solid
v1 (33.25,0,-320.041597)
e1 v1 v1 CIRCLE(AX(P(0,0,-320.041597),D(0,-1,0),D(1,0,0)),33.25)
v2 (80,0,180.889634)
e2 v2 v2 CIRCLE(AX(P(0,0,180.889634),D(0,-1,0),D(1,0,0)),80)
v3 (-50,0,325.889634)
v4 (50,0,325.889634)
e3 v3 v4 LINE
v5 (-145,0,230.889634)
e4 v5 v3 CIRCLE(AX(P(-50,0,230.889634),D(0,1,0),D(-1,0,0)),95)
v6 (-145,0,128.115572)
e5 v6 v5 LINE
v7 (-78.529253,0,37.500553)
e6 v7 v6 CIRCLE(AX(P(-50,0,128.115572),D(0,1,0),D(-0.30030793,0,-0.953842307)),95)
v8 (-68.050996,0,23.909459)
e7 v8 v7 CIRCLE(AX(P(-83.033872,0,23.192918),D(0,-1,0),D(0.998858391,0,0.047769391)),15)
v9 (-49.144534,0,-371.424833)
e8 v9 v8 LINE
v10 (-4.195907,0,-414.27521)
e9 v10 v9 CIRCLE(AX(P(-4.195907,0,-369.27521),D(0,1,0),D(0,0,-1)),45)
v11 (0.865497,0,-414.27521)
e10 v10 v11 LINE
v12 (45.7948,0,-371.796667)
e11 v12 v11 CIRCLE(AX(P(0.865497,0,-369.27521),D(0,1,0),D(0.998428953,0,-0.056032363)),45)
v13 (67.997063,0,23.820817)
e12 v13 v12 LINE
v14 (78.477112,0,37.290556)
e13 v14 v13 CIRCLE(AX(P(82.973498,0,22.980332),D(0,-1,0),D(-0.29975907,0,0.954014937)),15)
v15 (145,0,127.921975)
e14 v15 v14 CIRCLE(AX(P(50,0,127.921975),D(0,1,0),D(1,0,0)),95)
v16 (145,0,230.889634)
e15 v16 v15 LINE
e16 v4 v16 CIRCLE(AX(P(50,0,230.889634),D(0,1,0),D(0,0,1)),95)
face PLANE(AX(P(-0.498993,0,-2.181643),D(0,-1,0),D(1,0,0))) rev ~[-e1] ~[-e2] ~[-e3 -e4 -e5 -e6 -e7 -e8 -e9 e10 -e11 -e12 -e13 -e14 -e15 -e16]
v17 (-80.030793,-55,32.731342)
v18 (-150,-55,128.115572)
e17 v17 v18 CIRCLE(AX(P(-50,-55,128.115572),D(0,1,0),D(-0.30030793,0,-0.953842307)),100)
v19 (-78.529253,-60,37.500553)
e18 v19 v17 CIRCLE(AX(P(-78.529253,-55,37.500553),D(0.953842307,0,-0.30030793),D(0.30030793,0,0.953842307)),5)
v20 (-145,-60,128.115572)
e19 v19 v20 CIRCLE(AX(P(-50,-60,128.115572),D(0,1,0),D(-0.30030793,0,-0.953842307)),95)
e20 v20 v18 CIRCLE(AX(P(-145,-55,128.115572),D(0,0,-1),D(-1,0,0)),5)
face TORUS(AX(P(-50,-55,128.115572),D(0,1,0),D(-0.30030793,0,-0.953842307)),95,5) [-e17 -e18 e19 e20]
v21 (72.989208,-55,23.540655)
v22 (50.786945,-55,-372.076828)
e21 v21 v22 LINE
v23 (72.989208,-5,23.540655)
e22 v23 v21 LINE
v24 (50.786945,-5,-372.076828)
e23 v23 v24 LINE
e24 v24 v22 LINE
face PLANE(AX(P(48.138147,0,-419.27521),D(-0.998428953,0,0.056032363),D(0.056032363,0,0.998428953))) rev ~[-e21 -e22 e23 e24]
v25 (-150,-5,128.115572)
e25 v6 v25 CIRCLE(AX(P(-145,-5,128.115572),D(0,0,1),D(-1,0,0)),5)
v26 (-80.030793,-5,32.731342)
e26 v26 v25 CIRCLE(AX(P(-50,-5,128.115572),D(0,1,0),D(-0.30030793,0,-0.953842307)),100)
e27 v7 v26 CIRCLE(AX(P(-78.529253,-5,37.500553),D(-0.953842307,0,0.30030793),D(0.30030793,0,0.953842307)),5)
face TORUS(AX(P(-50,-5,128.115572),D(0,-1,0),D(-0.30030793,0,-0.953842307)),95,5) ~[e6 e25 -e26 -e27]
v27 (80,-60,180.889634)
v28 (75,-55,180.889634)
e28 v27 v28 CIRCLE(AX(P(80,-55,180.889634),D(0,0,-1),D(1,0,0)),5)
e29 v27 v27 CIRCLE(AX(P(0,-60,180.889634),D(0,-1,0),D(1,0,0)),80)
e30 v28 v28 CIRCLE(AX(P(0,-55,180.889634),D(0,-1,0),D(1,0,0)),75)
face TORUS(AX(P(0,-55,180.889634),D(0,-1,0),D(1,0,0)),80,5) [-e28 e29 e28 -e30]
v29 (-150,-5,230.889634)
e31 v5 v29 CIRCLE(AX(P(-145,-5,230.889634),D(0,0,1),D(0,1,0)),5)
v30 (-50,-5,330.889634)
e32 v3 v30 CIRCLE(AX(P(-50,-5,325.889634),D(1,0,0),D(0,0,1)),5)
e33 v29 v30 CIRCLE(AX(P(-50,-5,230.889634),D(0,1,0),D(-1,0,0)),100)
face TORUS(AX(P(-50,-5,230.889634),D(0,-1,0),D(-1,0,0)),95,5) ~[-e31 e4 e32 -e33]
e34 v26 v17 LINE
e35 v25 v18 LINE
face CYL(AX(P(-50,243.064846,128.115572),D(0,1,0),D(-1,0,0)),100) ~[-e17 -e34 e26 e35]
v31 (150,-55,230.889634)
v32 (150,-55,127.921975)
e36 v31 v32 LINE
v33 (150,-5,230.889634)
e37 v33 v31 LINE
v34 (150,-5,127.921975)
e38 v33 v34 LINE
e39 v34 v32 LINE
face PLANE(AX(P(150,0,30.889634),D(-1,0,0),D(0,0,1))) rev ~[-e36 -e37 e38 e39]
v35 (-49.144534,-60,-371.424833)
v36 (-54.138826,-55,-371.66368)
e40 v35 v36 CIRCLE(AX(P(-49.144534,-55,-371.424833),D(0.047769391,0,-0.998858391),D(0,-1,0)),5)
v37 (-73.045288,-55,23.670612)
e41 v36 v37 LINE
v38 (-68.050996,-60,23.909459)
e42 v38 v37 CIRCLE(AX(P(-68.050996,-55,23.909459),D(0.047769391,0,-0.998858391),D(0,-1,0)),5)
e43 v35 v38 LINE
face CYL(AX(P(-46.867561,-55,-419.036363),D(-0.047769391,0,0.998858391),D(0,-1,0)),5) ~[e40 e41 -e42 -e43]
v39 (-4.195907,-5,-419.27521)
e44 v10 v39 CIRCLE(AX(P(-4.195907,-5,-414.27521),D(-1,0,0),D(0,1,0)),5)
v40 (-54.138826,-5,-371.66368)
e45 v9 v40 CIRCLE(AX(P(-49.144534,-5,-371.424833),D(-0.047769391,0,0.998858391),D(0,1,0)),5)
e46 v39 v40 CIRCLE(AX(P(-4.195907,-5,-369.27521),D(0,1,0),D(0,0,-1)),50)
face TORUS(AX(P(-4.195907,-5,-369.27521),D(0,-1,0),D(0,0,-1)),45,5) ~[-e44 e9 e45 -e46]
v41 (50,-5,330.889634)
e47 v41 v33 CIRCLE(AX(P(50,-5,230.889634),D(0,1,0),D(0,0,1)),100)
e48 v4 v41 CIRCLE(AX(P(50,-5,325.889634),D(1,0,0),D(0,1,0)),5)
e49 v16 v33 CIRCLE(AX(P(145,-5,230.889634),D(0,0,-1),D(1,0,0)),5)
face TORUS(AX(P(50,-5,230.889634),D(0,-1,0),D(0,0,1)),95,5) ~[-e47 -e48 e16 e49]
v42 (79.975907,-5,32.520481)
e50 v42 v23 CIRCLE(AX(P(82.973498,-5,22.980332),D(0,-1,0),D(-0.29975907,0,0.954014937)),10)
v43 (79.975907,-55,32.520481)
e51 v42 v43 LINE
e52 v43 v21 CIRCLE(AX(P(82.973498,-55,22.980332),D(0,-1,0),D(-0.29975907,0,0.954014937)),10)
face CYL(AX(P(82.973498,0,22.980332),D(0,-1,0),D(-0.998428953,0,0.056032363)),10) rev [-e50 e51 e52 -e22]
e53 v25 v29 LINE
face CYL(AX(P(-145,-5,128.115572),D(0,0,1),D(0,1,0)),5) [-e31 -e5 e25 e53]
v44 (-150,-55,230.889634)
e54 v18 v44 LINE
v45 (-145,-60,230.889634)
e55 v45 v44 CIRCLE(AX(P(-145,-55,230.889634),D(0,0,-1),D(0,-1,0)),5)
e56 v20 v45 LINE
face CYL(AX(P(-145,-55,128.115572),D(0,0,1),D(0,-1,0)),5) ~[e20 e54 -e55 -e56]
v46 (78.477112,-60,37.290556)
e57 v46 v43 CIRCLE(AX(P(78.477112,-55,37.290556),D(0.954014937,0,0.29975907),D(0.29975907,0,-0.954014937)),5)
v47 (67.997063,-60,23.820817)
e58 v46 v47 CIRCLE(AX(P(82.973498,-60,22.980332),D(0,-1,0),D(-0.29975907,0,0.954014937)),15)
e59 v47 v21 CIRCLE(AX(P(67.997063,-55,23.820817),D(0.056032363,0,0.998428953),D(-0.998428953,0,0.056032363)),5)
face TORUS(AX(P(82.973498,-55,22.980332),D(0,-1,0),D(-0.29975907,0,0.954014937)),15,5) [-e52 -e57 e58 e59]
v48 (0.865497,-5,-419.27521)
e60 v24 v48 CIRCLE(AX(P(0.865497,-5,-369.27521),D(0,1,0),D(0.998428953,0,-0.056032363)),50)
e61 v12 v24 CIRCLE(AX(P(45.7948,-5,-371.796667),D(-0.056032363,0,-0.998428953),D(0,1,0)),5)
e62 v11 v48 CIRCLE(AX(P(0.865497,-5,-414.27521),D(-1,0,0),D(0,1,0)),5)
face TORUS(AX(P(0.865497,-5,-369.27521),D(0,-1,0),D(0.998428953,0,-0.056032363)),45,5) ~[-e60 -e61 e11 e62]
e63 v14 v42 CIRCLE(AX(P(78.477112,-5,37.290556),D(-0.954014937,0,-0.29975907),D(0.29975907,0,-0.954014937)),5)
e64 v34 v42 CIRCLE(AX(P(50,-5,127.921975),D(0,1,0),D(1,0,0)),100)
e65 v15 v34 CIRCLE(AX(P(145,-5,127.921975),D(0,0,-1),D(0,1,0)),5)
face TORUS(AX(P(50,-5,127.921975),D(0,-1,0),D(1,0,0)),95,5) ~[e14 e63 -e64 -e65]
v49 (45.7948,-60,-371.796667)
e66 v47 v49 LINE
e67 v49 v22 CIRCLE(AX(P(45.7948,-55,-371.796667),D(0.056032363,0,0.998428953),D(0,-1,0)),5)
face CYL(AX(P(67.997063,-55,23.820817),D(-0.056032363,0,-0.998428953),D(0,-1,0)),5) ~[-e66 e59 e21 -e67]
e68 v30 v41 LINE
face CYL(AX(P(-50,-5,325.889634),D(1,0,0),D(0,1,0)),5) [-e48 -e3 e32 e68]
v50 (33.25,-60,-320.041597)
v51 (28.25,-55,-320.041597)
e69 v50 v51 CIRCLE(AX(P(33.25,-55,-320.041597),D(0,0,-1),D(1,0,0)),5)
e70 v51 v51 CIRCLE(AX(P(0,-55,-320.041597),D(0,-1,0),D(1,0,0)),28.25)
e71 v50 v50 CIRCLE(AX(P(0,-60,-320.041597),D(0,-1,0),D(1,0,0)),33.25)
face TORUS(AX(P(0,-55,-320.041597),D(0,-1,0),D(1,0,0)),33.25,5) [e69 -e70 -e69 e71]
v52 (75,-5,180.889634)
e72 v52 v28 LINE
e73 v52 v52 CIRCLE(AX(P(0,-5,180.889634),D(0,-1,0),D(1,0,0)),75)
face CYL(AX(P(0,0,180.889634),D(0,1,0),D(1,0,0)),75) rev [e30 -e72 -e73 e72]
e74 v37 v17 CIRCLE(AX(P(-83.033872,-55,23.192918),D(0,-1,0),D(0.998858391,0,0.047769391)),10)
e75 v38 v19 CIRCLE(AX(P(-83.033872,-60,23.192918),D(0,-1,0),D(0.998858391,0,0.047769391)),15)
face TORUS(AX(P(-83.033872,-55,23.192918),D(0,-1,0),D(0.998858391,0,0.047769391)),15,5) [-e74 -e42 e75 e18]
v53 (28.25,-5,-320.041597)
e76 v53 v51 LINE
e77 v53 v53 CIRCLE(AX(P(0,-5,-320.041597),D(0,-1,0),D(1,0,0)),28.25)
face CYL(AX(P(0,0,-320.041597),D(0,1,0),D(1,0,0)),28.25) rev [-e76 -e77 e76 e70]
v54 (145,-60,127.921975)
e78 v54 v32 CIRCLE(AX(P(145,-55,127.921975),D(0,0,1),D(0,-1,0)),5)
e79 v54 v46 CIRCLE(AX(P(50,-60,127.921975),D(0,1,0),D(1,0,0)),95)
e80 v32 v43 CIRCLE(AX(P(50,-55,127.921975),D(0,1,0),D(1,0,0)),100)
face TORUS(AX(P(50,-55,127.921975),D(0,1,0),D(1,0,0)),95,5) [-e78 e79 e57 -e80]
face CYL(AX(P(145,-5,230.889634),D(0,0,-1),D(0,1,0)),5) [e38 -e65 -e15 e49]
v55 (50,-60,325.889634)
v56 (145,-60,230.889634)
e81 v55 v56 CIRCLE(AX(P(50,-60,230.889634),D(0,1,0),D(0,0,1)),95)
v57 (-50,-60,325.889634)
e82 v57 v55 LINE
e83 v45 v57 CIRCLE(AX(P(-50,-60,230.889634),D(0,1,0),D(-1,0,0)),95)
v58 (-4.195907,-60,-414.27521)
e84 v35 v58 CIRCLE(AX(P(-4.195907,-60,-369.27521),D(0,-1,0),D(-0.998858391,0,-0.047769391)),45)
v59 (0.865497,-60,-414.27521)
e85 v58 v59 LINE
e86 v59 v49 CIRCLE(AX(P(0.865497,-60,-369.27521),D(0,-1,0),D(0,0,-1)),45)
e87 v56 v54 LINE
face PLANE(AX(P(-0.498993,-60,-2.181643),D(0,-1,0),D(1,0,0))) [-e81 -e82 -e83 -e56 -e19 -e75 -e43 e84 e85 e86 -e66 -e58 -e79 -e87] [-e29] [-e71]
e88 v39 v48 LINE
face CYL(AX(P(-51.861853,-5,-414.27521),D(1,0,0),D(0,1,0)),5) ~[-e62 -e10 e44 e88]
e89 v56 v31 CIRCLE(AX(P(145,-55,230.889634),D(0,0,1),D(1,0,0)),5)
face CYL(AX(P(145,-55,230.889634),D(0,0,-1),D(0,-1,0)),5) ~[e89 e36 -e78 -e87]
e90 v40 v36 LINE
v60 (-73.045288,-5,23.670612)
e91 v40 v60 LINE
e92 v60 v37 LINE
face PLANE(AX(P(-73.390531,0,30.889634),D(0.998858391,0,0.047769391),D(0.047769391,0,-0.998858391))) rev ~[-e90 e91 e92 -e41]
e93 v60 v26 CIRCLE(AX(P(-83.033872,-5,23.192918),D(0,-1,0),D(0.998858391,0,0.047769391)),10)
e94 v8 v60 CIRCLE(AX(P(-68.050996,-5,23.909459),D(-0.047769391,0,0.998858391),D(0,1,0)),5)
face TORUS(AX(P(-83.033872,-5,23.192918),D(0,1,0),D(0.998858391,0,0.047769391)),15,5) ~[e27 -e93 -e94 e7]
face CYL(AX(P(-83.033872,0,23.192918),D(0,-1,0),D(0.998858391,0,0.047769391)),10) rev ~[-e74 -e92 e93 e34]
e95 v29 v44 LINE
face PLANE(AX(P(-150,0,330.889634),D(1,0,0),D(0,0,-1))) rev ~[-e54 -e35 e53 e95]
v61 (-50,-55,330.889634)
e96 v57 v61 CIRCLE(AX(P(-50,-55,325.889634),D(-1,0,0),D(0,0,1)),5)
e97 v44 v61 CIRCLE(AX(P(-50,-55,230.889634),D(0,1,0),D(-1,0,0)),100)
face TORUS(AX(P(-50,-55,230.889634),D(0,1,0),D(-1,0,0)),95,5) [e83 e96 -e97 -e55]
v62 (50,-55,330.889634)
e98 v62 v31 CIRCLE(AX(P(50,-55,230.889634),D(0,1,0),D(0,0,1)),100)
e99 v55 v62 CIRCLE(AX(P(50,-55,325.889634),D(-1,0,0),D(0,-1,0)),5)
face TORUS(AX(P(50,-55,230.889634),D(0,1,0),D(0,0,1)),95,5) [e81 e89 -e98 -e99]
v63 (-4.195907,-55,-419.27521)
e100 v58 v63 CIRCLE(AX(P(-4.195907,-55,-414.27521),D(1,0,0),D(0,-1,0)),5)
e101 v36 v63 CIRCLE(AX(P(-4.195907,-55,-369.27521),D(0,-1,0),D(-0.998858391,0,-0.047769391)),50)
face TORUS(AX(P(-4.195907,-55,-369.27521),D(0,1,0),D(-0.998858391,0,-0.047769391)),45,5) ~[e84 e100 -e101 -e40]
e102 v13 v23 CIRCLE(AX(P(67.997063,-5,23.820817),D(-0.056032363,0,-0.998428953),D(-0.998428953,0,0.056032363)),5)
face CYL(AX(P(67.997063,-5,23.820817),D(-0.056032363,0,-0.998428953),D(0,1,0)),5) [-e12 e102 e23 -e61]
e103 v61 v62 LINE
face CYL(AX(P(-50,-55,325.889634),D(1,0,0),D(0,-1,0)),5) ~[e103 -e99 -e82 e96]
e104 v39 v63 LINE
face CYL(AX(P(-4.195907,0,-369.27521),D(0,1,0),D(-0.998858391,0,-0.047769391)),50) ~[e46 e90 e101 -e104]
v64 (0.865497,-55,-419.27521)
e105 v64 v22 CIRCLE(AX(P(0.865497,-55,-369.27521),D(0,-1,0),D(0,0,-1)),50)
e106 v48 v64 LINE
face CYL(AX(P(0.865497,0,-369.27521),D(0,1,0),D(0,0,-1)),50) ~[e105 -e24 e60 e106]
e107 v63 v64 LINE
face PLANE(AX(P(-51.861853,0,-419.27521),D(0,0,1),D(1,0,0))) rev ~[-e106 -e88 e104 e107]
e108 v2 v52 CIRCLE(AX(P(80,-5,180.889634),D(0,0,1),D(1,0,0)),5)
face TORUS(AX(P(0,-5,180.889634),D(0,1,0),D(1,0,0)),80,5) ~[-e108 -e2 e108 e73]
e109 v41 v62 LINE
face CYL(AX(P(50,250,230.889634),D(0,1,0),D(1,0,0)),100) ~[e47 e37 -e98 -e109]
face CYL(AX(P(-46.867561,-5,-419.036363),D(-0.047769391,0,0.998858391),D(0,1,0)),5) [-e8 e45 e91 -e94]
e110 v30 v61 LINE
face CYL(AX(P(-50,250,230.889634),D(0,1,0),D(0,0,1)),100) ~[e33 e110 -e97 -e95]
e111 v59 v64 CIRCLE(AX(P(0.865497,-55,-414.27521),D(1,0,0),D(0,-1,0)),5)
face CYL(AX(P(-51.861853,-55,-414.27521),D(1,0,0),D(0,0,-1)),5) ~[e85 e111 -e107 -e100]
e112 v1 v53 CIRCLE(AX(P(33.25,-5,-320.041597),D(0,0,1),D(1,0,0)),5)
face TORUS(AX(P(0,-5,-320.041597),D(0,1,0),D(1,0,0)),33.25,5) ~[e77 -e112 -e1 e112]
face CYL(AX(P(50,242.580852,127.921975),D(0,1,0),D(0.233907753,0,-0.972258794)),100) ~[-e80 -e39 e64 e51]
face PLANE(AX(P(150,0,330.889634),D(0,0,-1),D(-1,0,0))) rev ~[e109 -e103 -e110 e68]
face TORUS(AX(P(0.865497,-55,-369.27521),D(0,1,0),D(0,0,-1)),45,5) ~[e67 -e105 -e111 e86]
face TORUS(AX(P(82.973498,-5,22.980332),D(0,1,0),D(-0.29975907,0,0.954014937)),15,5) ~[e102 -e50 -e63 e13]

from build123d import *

# Parameters (mm, degrees)
F0_R         = 28.25
F0_R_2       = 75
F1_DEPTH     = 60
F3_T1_DEPTH  = 545.1617031196
F3_T3_DEPTH  = 546.1296912431
F3_T5_DEPTH  = 560
F4_R         = 10
F5_R         = 5
F6_T1_DEPTH  = 60
F6_T4_ANGLE  = 87.2619735231
F6_T6_ANGLE  = 87.2619735231
F6_T8_ANGLE  = 86.7878998104
F6_T10_ANGLE = 86.7878998104


# Not quite as in the source:
# - a fillet or chamfer that OpenCascade refuses, or shapes differently, is made with other operations: its cross-section is extruded or revolved along the edge and cut away or added
# - a feature of the source that left no trace in its solid (it failed there, or was rolled back) is left out


with BuildPart() as f1:
    # F0 (on Front) → F1 (new body)
    with BuildSketch(Plane.XZ):
        Polygon((-73.3905308122, 30.889634043), (-51.8618531352, -419.2752103038), (48.1381468648, -419.2752103038), (73.3907752815, 30.6960952328), (150, 30.889634043), (150, 330.889634043), (-150, 330.889634043), (-150, 30.889634043), align=None)
        with Locations((0, -320.0415968895)):
            Circle(F0_R, mode=Mode.SUBTRACT)
        with Locations((0, 180.889634043)):
            Circle(F0_R_2, mode=Mode.SUBTRACT)
    extrude(amount=F1_DEPTH)

    # F3: fillet of radius 100 on 4 edges, made by hand

    # F3_s2 → F3_t1 (cut)
    with BuildSketch(Plane.XZ.offset(-242.5808515598)):
        with BuildLine():
            ThreePointArc((73.3907752815, 30.6960952328), (128.5464115289, 66.0312545554), (150, 127.9219746669))
            Line((150, 127.9219746669), (150, 30.889634043))
            Line((150, 30.889634043), (73.3907752815, 30.6960952328))
        make_face()
    extrude(amount=F3_T1_DEPTH, mode=Mode.SUBTRACT)

    # F3_s4 → F3_t3 (cut)
    with BuildSketch(Plane.XZ.offset(-243.0648456216)):
        with BuildLine():
            ThreePointArc((-150, 128.1155722916), (-128.5463337184, 66.2247534297), (-73.3905308122, 30.889634043))
            Line((-73.3905308122, 30.889634043), (-150, 30.889634043))
            Line((-150, 30.889634043), (-150, 128.1155722916))
        make_face()
    extrude(amount=F3_T3_DEPTH, mode=Mode.SUBTRACT)

    # F3_s6 → F3_t5 (cut)
    with BuildSketch(Plane.XZ.offset(-250)):
        with BuildLine():
            ThreePointArc((150, 230.889634043), (120.7106781187, 301.6003121616), (50, 330.889634043))
            Line((50, 330.889634043), (150, 330.889634043))
            Line((150, 330.889634043), (150, 230.889634043))
        make_face()
        with BuildLine():
            ThreePointArc((-50, 330.889634043), (-120.7106781187, 301.6003121616), (-150, 230.889634043))
            Line((-150, 230.889634043), (-150, 330.889634043))
            Line((-150, 330.889634043), (-50, 330.889634043))
        make_face()
    extrude(amount=F3_T5_DEPTH, mode=Mode.SUBTRACT)

    # F4
    f4_edges = [f1.edges().sort_by_distance(p)[0] for p in [
        (-73.390531, -30, 30.889634),
        (73.390775, -30, 30.696095),
    ]]
    fillet(f4_edges, radius=F4_R)

    # F5
    f5_edges = [f1.edges().sort_by_distance(p)[0] for p in [
        (-130.632125, 0, 68.967788),
        (-75.114274, 0, 29.298651),
        (-150, 0, 179.502603),
        (-62.453571, 0, -197.802299),
        (-120.710678, 0, 301.600312),
        (-1.861853, 0, -419.27521),
        (0, 0, 330.889634),
        (60.563678, 0, -197.867278),
        (120.710678, 0, 301.600312),
        (75.080994, 0, 29.121046),
        (150, 0, 179.405804),
        (130.615106, 0, 68.750997),
        (-28.25, 0, -320.041597),
        (-75, 0, 180.889634),
        (-130.632125, -60, 68.967788),
        (-75.114274, -60, 29.298651),
        (-150, -60, 179.502603),
        (-62.453571, -60, -197.802299),
        (-120.710678, -60, 301.600312),
        (-1.861853, -60, -419.27521),
        (0, -60, 330.889634),
        (60.563678, -60, -197.867278),
        (120.710678, -60, 301.600312),
        (75.080994, -60, 29.121046),
        (150, -60, 179.405804),
        (130.615106, -60, 68.750997),
        (-28.25, -60, -320.041597),
        (-75, -60, 180.889634),
    ]]
    fillet(f5_edges, radius=F5_R)

    # F6: fillet of radius 50 on 2 edges, made by hand

    # F6_s2 → F6_t1 (cut)
    with BuildSketch(Plane.XZ):
        with BuildLine():
            ThreePointArc((0.8654974445, -419.2752103038), (35.2160366942, -405.6075712682), (50.7869450983, -372.0768284339))
            Line((50.7869450983, -372.0768284339), (48.1381468648, -419.2752103038))
            Line((48.1381468648, -419.2752103038), (0.8654974445, -419.2752103038))
        make_face()
        with BuildLine():
            ThreePointArc((-54.1388263505, -371.6636798405), (-38.6964613108, -405.4651500442), (-4.1959067996, -419.2752103038))
            Line((-4.1959067996, -419.2752103038), (-51.8618531352, -419.2752103038))
            Line((-51.8618531352, -419.2752103038), (-54.1388263505, -371.6636798405))
        make_face()
    extrude(amount=F6_T1_DEPTH, mode=Mode.SUBTRACT)

    # F6_s3 → F6_t4 (revolve, cut)
    with BuildSketch(Plane.YZ.offset(-4.1959067996)):
        with BuildLine():
            ThreePointArc((0, -414.2752103038), (-1.4644660941, -417.8107442097), (-5, -419.2752103038))
            Line((-5, -419.2752103038), (0, -419.2752103038))
            Line((0, -419.2752103038), (0, -414.2752103038))
        make_face()
    revolve(axis=Axis((-4.1959067996, 0, -369.2752103038), (0, 1, 0)), revolution_arc=F6_T4_ANGLE, mode=Mode.SUBTRACT)

    # F6_s5 → F6_t6 (revolve, cut)
    with BuildSketch(Plane(origin=(17.6103390671, 0, -368.2323486843), x_dir=(0, 1, 0), z_dir=(-0.0477693907, 0, 0.998858391))):
        with BuildLine():
            ThreePointArc((-60, 66.8311685248), (-58.5355339059, 70.3667024307), (-55, 71.8311685248))
            Line((-55, 71.8311685248), (-60, 71.8311685248))
            Line((-60, 71.8311685248), (-60, 66.8311685248))
        make_face()
    revolve(axis=Axis((-4.1959067996, -60, -369.2752103038), (0, -1, 0)), revolution_arc=F6_T6_ANGLE, mode=Mode.SUBTRACT)

    # F6_s7 → F6_t8 (revolve, cut)
    with BuildSketch(Plane(origin=(-20.6561380445, 0, -368.067404701), x_dir=(0, 1, 0), z_dir=(0.0560323626, 0, 0.9984289531))):
        with BuildLine():
            ThreePointArc((0, -66.5555001912), (-1.4644660941, -70.0910340971), (-5, -71.5555001912))
            Line((-5, -71.5555001912), (0, -71.5555001912))
            Line((0, -71.5555001912), (0, -66.5555001912))
        make_face()
    revolve(axis=Axis((0.8654974445, 0, -369.2752103038), (0, 1, 0)), revolution_arc=F6_T8_ANGLE, mode=Mode.SUBTRACT)

    # F6_s9 → F6_t10 (revolve, cut)
    with BuildSketch(Plane.YZ.offset(0.8654974445)):
        with BuildLine():
            ThreePointArc((-60, -414.2752103038), (-58.5355339059, -417.8107442097), (-55, -419.2752103038))
            Line((-55, -419.2752103038), (-60, -419.2752103038))
            Line((-60, -419.2752103038), (-60, -414.2752103038))
        make_face()
    revolve(axis=Axis((0.8654974445, -60, -369.2752103038), (0, -1, 0)), revolution_arc=F6_T10_ANGLE, mode=Mode.SUBTRACT)


solid = f1.part
